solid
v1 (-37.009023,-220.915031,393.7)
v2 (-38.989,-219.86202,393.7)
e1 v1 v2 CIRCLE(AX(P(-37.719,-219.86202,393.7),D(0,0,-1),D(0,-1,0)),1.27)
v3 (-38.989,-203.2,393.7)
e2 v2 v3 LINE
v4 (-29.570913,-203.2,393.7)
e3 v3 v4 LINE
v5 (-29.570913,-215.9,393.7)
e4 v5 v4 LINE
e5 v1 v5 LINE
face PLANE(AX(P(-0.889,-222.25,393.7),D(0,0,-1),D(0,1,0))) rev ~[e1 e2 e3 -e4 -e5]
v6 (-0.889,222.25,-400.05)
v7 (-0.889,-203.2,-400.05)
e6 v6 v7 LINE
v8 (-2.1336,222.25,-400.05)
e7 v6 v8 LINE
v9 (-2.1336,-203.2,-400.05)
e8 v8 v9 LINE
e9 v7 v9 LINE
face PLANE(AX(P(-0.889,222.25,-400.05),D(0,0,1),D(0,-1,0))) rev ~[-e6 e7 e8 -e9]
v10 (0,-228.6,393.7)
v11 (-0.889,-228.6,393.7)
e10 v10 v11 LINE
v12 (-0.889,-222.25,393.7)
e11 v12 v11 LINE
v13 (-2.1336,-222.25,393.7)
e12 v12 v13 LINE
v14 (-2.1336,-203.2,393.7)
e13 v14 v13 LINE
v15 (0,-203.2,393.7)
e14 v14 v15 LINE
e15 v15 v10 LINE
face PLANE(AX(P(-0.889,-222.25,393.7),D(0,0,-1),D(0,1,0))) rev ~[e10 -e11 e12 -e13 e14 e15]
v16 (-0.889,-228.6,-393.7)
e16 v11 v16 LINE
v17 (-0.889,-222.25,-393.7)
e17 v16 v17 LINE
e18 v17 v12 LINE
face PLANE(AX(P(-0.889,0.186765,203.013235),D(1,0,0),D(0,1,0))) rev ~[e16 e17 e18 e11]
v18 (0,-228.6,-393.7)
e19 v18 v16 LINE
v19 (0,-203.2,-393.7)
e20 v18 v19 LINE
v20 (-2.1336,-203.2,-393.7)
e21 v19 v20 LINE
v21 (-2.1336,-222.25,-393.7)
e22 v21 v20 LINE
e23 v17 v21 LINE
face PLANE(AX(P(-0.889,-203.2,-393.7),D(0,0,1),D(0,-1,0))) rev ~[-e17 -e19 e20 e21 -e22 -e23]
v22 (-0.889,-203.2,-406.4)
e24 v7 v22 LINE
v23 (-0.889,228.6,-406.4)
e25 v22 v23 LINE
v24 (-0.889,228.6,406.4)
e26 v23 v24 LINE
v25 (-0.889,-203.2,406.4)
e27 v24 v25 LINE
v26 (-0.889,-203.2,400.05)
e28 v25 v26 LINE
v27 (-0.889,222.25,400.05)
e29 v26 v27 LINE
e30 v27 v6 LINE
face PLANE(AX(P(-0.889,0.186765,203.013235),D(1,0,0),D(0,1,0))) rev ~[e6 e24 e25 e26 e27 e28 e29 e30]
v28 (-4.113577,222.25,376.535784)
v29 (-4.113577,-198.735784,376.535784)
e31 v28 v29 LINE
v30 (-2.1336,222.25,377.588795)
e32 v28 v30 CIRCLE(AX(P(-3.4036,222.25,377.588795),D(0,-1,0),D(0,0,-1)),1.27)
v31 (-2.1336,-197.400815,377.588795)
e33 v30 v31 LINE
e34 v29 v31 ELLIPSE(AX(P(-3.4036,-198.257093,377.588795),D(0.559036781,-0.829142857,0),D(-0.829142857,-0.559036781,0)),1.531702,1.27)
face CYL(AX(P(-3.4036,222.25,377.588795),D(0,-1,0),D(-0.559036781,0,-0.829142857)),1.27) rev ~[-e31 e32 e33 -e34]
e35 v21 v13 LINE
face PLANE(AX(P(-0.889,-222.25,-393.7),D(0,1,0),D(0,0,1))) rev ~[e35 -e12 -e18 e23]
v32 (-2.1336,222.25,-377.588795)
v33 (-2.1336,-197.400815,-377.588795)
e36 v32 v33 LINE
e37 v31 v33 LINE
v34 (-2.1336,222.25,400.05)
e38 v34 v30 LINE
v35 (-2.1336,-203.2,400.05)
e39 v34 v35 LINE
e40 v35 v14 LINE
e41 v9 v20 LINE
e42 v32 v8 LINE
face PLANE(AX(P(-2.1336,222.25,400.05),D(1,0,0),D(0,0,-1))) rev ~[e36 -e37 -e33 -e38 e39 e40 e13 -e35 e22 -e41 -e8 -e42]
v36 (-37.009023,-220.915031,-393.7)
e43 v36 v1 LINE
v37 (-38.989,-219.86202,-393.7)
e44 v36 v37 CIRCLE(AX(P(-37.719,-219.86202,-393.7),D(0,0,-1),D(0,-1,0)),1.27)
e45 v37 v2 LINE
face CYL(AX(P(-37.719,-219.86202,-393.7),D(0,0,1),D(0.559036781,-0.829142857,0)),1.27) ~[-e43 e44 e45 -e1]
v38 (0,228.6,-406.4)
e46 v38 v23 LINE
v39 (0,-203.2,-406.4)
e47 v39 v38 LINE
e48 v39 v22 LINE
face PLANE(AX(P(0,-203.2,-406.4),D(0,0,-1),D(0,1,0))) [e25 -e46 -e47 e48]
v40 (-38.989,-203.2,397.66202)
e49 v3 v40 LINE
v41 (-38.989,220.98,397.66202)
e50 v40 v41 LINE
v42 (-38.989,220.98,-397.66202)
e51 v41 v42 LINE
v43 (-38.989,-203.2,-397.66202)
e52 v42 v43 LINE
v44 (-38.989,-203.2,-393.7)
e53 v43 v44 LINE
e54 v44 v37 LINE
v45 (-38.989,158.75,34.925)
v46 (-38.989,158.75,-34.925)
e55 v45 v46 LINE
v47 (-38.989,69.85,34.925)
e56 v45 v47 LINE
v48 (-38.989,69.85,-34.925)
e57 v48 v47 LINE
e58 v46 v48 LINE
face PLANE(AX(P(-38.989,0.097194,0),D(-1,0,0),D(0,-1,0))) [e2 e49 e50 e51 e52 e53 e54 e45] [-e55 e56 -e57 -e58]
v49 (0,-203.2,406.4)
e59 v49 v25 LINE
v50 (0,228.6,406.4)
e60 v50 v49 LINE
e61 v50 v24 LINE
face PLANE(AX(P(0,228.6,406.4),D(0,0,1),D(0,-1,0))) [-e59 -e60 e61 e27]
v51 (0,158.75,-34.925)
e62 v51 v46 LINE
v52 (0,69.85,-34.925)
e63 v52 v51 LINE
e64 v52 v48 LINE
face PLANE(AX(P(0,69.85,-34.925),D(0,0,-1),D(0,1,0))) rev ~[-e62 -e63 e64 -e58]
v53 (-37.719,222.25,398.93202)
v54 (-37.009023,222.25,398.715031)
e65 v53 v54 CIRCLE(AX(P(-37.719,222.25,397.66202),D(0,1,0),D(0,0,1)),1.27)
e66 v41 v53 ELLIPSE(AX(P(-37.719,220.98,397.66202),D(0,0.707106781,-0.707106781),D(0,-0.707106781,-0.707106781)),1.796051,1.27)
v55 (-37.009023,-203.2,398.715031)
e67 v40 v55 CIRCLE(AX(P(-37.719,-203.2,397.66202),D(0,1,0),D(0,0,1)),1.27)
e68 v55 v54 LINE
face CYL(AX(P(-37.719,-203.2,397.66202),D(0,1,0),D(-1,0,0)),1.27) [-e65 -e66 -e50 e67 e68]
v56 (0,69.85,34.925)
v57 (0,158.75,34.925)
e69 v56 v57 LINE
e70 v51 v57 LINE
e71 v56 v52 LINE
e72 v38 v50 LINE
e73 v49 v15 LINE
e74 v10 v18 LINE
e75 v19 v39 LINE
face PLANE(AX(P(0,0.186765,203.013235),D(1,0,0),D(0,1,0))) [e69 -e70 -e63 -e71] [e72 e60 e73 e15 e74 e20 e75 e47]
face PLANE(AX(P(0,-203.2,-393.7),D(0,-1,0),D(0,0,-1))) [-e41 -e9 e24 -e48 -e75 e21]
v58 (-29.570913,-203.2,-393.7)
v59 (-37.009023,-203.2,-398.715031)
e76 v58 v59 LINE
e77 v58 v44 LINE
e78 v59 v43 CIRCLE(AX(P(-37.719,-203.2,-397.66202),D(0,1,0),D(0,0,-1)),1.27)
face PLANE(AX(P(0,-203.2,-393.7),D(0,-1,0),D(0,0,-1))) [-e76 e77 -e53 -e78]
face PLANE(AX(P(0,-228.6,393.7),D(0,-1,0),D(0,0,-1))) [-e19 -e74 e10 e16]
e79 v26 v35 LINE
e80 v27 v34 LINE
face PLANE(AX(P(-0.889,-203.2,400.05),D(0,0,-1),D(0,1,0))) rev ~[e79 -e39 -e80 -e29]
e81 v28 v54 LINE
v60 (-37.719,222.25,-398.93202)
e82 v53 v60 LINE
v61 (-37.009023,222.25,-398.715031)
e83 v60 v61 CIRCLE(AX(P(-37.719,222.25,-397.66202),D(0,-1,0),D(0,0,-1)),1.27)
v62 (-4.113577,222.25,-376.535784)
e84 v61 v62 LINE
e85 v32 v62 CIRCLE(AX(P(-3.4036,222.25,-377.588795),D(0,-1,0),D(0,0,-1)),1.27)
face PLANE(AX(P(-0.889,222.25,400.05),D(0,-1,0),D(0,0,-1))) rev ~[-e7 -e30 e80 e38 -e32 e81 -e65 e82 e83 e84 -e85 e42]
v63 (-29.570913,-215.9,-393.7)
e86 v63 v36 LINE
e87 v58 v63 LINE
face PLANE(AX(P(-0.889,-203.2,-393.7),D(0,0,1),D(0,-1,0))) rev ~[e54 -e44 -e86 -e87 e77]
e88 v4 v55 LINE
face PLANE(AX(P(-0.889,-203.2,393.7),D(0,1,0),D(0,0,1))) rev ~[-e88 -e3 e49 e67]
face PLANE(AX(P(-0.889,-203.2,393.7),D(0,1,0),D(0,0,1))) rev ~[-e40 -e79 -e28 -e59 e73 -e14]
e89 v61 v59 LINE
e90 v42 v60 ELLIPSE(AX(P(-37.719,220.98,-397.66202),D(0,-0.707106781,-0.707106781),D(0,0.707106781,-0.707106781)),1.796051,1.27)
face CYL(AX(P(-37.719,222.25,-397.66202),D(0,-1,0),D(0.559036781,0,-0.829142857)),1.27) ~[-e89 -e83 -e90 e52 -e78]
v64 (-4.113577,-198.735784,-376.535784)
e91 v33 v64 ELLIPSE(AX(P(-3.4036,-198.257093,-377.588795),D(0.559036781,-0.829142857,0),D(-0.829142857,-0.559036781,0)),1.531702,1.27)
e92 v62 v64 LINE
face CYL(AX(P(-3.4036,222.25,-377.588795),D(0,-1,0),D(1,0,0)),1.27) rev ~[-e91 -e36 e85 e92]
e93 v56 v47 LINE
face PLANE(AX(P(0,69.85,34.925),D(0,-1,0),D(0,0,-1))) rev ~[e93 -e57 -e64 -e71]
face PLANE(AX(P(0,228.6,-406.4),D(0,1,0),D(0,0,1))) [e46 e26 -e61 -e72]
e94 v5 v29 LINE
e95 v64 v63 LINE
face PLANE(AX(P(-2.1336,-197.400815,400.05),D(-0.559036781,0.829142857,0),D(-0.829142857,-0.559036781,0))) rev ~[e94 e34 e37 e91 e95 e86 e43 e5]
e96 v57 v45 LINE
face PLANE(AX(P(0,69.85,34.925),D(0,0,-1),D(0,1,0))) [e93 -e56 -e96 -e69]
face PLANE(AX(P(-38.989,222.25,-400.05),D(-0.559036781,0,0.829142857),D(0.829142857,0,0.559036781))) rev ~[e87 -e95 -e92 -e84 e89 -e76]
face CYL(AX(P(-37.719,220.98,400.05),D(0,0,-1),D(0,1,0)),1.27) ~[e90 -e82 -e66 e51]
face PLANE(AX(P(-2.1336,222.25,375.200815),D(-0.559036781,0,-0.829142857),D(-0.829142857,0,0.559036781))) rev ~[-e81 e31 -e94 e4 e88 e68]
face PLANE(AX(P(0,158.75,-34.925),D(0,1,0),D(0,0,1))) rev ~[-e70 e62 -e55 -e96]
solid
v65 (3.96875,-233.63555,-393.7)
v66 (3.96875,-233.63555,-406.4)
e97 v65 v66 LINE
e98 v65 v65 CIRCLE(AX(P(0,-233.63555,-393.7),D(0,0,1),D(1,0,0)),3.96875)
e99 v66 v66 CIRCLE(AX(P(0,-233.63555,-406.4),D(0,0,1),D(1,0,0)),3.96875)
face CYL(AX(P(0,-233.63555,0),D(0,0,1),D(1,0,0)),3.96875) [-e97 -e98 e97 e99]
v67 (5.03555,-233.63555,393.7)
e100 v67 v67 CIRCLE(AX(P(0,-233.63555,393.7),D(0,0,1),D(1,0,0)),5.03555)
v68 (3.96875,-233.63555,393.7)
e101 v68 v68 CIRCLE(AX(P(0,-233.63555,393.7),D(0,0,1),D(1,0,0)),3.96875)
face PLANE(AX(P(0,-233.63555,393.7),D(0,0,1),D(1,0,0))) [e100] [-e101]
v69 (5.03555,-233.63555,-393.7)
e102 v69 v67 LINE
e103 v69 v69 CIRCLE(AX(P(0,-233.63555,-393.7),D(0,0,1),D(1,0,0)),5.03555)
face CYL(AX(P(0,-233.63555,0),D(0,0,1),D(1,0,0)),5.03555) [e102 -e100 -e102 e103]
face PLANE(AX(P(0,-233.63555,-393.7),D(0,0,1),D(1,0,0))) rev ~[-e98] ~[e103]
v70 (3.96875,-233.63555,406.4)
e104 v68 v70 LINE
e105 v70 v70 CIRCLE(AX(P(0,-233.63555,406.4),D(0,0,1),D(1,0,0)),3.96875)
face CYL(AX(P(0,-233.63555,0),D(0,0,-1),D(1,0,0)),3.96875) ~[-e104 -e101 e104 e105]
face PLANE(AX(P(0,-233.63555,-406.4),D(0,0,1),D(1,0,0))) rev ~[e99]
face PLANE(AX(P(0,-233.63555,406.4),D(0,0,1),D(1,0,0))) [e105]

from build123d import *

# Parameters (mm, degrees)
F1_DEPTH       = 0.889
F3_DEPTH       = 38.1
F5_DEPTH       = 450.851
F7_DEPTH       = 806.451
F8_R           = 1.27
F9_R           = 1.27
F10_W          = 88.9
F10_H          = 34.925
F11_DEPTH      = 38.99
F12_R          = 5.03555
F12_R_2        = 3.96875
F13_DEPTH      = 393.7
F13_DEPTH_BACK = 393.7
F14_R          = 3.96875
F15_DEPTH      = 406.4
F15_DEPTH_BACK = 406.4


with BuildPart() as f1:
    # F0 (on Right) → F1 (new body)
    with BuildSketch(Plane.YZ):
        Polygon((228.6, 406.4), (-203.2, 406.4), (-203.2, 393.7), (-228.6, 393.7), (-228.6, 0), (228.6, 0), align=None)
        Polygon((228.6, -406.4), (228.6, 0), (-228.6, 0), (-228.6, -393.7), (-203.2, -393.7), (-203.2, -406.4), align=None)
    extrude(amount=-F1_DEPTH)

    # F2 (on face) → F3 (join)
    with BuildSketch(Plane(origin=(-0.889, 0, 0), x_dir=(0, -1, 0), z_dir=(-1, 0, 0))):
        Polygon((203.2, 400.05), (-222.25, 400.05), (-222.25, -400.05), (203.2, -400.05), (203.2, -393.7), (222.25, -393.7), (222.25, 393.7), (203.2, 393.7), align=None)
    extrude(amount=F3_DEPTH)

    # F4 (on face) → F5 (cut, through all)
    with BuildSketch(Plane(origin=(0, 222.25, 0), x_dir=(-1, 0, 0), z_dir=(0, 1, 0))):
        Polygon((2.1336, -400.05), (38.989, -400.05), (2.1336, -375.200815087), align=None)
        Polygon((2.1336, 375.200815087), (38.989, 400.05), (2.1336, 400.05), align=None)
    extrude(amount=-F5_DEPTH, mode=Mode.SUBTRACT)

    # F6 (on face) → F7 (cut, through all)
    with BuildSketch(Plane.XY.offset(400.05)):
        Polygon((-2.1336, 247.099184913), (-38.989, 222.25), (-2.1336, 222.25), align=None)
        Polygon((-2.1336, -203.2), (-2.1336, -197.400815087), (-38.989, -222.25), (-2.1336, -222.25), align=None)
    extrude(amount=-F7_DEPTH, mode=Mode.SUBTRACT)

    # F8
    f8_edges = [f1.edges().sort_by_distance(p)[0] for p in [
        (-38.989, 9.525, -400.05),
        (-38.989, 222.25, 0),
        (-38.989, 9.525, 400.05),
        (-38.989, -222.25, 0),
    ]]
    fillet(f8_edges, radius=F8_R)

    # F9
    f9_edges = [f1.edges().sort_by_distance(p)[0] for p in [
        (-2.1336, 12.424592, 375.200815),
        (-2.1336, 12.424592, -375.200815),
    ]]
    fillet(f9_edges, radius=F9_R)

    # F10 (on face) → F11 (cut, through all)
    with BuildSketch(Plane.YZ):
        with Locations((114.3, 17.4625)):
            Rectangle(F10_W, F10_H)
        with Locations((114.3, -17.4625)):
            Rectangle(F10_W, F10_H)
    extrude(amount=-F11_DEPTH, mode=Mode.SUBTRACT)


with BuildPart() as f13:
    # F12 (on Top) → F13 (new body, two sides)
    with BuildSketch(Plane.XY) as f13_sk:
        with Locations((0, -233.63555)):
            Circle(F12_R)
        with Locations((0, -233.63555)):
            Circle(F12_R_2, mode=Mode.SUBTRACT)
    extrude(amount=F13_DEPTH)
    extrude(f13_sk.sketch, amount=-F13_DEPTH_BACK)

    # F14 (on Top) → F15 (join, two sides)
    with BuildSketch(Plane.XY) as f15_sk:
        with Locations((0, -233.63555)):
            Circle(F14_R)
    extrude(amount=F15_DEPTH)
    extrude(f15_sk.sketch, amount=-F15_DEPTH_BACK)


solid = Compound([f1.part, f13.part])
